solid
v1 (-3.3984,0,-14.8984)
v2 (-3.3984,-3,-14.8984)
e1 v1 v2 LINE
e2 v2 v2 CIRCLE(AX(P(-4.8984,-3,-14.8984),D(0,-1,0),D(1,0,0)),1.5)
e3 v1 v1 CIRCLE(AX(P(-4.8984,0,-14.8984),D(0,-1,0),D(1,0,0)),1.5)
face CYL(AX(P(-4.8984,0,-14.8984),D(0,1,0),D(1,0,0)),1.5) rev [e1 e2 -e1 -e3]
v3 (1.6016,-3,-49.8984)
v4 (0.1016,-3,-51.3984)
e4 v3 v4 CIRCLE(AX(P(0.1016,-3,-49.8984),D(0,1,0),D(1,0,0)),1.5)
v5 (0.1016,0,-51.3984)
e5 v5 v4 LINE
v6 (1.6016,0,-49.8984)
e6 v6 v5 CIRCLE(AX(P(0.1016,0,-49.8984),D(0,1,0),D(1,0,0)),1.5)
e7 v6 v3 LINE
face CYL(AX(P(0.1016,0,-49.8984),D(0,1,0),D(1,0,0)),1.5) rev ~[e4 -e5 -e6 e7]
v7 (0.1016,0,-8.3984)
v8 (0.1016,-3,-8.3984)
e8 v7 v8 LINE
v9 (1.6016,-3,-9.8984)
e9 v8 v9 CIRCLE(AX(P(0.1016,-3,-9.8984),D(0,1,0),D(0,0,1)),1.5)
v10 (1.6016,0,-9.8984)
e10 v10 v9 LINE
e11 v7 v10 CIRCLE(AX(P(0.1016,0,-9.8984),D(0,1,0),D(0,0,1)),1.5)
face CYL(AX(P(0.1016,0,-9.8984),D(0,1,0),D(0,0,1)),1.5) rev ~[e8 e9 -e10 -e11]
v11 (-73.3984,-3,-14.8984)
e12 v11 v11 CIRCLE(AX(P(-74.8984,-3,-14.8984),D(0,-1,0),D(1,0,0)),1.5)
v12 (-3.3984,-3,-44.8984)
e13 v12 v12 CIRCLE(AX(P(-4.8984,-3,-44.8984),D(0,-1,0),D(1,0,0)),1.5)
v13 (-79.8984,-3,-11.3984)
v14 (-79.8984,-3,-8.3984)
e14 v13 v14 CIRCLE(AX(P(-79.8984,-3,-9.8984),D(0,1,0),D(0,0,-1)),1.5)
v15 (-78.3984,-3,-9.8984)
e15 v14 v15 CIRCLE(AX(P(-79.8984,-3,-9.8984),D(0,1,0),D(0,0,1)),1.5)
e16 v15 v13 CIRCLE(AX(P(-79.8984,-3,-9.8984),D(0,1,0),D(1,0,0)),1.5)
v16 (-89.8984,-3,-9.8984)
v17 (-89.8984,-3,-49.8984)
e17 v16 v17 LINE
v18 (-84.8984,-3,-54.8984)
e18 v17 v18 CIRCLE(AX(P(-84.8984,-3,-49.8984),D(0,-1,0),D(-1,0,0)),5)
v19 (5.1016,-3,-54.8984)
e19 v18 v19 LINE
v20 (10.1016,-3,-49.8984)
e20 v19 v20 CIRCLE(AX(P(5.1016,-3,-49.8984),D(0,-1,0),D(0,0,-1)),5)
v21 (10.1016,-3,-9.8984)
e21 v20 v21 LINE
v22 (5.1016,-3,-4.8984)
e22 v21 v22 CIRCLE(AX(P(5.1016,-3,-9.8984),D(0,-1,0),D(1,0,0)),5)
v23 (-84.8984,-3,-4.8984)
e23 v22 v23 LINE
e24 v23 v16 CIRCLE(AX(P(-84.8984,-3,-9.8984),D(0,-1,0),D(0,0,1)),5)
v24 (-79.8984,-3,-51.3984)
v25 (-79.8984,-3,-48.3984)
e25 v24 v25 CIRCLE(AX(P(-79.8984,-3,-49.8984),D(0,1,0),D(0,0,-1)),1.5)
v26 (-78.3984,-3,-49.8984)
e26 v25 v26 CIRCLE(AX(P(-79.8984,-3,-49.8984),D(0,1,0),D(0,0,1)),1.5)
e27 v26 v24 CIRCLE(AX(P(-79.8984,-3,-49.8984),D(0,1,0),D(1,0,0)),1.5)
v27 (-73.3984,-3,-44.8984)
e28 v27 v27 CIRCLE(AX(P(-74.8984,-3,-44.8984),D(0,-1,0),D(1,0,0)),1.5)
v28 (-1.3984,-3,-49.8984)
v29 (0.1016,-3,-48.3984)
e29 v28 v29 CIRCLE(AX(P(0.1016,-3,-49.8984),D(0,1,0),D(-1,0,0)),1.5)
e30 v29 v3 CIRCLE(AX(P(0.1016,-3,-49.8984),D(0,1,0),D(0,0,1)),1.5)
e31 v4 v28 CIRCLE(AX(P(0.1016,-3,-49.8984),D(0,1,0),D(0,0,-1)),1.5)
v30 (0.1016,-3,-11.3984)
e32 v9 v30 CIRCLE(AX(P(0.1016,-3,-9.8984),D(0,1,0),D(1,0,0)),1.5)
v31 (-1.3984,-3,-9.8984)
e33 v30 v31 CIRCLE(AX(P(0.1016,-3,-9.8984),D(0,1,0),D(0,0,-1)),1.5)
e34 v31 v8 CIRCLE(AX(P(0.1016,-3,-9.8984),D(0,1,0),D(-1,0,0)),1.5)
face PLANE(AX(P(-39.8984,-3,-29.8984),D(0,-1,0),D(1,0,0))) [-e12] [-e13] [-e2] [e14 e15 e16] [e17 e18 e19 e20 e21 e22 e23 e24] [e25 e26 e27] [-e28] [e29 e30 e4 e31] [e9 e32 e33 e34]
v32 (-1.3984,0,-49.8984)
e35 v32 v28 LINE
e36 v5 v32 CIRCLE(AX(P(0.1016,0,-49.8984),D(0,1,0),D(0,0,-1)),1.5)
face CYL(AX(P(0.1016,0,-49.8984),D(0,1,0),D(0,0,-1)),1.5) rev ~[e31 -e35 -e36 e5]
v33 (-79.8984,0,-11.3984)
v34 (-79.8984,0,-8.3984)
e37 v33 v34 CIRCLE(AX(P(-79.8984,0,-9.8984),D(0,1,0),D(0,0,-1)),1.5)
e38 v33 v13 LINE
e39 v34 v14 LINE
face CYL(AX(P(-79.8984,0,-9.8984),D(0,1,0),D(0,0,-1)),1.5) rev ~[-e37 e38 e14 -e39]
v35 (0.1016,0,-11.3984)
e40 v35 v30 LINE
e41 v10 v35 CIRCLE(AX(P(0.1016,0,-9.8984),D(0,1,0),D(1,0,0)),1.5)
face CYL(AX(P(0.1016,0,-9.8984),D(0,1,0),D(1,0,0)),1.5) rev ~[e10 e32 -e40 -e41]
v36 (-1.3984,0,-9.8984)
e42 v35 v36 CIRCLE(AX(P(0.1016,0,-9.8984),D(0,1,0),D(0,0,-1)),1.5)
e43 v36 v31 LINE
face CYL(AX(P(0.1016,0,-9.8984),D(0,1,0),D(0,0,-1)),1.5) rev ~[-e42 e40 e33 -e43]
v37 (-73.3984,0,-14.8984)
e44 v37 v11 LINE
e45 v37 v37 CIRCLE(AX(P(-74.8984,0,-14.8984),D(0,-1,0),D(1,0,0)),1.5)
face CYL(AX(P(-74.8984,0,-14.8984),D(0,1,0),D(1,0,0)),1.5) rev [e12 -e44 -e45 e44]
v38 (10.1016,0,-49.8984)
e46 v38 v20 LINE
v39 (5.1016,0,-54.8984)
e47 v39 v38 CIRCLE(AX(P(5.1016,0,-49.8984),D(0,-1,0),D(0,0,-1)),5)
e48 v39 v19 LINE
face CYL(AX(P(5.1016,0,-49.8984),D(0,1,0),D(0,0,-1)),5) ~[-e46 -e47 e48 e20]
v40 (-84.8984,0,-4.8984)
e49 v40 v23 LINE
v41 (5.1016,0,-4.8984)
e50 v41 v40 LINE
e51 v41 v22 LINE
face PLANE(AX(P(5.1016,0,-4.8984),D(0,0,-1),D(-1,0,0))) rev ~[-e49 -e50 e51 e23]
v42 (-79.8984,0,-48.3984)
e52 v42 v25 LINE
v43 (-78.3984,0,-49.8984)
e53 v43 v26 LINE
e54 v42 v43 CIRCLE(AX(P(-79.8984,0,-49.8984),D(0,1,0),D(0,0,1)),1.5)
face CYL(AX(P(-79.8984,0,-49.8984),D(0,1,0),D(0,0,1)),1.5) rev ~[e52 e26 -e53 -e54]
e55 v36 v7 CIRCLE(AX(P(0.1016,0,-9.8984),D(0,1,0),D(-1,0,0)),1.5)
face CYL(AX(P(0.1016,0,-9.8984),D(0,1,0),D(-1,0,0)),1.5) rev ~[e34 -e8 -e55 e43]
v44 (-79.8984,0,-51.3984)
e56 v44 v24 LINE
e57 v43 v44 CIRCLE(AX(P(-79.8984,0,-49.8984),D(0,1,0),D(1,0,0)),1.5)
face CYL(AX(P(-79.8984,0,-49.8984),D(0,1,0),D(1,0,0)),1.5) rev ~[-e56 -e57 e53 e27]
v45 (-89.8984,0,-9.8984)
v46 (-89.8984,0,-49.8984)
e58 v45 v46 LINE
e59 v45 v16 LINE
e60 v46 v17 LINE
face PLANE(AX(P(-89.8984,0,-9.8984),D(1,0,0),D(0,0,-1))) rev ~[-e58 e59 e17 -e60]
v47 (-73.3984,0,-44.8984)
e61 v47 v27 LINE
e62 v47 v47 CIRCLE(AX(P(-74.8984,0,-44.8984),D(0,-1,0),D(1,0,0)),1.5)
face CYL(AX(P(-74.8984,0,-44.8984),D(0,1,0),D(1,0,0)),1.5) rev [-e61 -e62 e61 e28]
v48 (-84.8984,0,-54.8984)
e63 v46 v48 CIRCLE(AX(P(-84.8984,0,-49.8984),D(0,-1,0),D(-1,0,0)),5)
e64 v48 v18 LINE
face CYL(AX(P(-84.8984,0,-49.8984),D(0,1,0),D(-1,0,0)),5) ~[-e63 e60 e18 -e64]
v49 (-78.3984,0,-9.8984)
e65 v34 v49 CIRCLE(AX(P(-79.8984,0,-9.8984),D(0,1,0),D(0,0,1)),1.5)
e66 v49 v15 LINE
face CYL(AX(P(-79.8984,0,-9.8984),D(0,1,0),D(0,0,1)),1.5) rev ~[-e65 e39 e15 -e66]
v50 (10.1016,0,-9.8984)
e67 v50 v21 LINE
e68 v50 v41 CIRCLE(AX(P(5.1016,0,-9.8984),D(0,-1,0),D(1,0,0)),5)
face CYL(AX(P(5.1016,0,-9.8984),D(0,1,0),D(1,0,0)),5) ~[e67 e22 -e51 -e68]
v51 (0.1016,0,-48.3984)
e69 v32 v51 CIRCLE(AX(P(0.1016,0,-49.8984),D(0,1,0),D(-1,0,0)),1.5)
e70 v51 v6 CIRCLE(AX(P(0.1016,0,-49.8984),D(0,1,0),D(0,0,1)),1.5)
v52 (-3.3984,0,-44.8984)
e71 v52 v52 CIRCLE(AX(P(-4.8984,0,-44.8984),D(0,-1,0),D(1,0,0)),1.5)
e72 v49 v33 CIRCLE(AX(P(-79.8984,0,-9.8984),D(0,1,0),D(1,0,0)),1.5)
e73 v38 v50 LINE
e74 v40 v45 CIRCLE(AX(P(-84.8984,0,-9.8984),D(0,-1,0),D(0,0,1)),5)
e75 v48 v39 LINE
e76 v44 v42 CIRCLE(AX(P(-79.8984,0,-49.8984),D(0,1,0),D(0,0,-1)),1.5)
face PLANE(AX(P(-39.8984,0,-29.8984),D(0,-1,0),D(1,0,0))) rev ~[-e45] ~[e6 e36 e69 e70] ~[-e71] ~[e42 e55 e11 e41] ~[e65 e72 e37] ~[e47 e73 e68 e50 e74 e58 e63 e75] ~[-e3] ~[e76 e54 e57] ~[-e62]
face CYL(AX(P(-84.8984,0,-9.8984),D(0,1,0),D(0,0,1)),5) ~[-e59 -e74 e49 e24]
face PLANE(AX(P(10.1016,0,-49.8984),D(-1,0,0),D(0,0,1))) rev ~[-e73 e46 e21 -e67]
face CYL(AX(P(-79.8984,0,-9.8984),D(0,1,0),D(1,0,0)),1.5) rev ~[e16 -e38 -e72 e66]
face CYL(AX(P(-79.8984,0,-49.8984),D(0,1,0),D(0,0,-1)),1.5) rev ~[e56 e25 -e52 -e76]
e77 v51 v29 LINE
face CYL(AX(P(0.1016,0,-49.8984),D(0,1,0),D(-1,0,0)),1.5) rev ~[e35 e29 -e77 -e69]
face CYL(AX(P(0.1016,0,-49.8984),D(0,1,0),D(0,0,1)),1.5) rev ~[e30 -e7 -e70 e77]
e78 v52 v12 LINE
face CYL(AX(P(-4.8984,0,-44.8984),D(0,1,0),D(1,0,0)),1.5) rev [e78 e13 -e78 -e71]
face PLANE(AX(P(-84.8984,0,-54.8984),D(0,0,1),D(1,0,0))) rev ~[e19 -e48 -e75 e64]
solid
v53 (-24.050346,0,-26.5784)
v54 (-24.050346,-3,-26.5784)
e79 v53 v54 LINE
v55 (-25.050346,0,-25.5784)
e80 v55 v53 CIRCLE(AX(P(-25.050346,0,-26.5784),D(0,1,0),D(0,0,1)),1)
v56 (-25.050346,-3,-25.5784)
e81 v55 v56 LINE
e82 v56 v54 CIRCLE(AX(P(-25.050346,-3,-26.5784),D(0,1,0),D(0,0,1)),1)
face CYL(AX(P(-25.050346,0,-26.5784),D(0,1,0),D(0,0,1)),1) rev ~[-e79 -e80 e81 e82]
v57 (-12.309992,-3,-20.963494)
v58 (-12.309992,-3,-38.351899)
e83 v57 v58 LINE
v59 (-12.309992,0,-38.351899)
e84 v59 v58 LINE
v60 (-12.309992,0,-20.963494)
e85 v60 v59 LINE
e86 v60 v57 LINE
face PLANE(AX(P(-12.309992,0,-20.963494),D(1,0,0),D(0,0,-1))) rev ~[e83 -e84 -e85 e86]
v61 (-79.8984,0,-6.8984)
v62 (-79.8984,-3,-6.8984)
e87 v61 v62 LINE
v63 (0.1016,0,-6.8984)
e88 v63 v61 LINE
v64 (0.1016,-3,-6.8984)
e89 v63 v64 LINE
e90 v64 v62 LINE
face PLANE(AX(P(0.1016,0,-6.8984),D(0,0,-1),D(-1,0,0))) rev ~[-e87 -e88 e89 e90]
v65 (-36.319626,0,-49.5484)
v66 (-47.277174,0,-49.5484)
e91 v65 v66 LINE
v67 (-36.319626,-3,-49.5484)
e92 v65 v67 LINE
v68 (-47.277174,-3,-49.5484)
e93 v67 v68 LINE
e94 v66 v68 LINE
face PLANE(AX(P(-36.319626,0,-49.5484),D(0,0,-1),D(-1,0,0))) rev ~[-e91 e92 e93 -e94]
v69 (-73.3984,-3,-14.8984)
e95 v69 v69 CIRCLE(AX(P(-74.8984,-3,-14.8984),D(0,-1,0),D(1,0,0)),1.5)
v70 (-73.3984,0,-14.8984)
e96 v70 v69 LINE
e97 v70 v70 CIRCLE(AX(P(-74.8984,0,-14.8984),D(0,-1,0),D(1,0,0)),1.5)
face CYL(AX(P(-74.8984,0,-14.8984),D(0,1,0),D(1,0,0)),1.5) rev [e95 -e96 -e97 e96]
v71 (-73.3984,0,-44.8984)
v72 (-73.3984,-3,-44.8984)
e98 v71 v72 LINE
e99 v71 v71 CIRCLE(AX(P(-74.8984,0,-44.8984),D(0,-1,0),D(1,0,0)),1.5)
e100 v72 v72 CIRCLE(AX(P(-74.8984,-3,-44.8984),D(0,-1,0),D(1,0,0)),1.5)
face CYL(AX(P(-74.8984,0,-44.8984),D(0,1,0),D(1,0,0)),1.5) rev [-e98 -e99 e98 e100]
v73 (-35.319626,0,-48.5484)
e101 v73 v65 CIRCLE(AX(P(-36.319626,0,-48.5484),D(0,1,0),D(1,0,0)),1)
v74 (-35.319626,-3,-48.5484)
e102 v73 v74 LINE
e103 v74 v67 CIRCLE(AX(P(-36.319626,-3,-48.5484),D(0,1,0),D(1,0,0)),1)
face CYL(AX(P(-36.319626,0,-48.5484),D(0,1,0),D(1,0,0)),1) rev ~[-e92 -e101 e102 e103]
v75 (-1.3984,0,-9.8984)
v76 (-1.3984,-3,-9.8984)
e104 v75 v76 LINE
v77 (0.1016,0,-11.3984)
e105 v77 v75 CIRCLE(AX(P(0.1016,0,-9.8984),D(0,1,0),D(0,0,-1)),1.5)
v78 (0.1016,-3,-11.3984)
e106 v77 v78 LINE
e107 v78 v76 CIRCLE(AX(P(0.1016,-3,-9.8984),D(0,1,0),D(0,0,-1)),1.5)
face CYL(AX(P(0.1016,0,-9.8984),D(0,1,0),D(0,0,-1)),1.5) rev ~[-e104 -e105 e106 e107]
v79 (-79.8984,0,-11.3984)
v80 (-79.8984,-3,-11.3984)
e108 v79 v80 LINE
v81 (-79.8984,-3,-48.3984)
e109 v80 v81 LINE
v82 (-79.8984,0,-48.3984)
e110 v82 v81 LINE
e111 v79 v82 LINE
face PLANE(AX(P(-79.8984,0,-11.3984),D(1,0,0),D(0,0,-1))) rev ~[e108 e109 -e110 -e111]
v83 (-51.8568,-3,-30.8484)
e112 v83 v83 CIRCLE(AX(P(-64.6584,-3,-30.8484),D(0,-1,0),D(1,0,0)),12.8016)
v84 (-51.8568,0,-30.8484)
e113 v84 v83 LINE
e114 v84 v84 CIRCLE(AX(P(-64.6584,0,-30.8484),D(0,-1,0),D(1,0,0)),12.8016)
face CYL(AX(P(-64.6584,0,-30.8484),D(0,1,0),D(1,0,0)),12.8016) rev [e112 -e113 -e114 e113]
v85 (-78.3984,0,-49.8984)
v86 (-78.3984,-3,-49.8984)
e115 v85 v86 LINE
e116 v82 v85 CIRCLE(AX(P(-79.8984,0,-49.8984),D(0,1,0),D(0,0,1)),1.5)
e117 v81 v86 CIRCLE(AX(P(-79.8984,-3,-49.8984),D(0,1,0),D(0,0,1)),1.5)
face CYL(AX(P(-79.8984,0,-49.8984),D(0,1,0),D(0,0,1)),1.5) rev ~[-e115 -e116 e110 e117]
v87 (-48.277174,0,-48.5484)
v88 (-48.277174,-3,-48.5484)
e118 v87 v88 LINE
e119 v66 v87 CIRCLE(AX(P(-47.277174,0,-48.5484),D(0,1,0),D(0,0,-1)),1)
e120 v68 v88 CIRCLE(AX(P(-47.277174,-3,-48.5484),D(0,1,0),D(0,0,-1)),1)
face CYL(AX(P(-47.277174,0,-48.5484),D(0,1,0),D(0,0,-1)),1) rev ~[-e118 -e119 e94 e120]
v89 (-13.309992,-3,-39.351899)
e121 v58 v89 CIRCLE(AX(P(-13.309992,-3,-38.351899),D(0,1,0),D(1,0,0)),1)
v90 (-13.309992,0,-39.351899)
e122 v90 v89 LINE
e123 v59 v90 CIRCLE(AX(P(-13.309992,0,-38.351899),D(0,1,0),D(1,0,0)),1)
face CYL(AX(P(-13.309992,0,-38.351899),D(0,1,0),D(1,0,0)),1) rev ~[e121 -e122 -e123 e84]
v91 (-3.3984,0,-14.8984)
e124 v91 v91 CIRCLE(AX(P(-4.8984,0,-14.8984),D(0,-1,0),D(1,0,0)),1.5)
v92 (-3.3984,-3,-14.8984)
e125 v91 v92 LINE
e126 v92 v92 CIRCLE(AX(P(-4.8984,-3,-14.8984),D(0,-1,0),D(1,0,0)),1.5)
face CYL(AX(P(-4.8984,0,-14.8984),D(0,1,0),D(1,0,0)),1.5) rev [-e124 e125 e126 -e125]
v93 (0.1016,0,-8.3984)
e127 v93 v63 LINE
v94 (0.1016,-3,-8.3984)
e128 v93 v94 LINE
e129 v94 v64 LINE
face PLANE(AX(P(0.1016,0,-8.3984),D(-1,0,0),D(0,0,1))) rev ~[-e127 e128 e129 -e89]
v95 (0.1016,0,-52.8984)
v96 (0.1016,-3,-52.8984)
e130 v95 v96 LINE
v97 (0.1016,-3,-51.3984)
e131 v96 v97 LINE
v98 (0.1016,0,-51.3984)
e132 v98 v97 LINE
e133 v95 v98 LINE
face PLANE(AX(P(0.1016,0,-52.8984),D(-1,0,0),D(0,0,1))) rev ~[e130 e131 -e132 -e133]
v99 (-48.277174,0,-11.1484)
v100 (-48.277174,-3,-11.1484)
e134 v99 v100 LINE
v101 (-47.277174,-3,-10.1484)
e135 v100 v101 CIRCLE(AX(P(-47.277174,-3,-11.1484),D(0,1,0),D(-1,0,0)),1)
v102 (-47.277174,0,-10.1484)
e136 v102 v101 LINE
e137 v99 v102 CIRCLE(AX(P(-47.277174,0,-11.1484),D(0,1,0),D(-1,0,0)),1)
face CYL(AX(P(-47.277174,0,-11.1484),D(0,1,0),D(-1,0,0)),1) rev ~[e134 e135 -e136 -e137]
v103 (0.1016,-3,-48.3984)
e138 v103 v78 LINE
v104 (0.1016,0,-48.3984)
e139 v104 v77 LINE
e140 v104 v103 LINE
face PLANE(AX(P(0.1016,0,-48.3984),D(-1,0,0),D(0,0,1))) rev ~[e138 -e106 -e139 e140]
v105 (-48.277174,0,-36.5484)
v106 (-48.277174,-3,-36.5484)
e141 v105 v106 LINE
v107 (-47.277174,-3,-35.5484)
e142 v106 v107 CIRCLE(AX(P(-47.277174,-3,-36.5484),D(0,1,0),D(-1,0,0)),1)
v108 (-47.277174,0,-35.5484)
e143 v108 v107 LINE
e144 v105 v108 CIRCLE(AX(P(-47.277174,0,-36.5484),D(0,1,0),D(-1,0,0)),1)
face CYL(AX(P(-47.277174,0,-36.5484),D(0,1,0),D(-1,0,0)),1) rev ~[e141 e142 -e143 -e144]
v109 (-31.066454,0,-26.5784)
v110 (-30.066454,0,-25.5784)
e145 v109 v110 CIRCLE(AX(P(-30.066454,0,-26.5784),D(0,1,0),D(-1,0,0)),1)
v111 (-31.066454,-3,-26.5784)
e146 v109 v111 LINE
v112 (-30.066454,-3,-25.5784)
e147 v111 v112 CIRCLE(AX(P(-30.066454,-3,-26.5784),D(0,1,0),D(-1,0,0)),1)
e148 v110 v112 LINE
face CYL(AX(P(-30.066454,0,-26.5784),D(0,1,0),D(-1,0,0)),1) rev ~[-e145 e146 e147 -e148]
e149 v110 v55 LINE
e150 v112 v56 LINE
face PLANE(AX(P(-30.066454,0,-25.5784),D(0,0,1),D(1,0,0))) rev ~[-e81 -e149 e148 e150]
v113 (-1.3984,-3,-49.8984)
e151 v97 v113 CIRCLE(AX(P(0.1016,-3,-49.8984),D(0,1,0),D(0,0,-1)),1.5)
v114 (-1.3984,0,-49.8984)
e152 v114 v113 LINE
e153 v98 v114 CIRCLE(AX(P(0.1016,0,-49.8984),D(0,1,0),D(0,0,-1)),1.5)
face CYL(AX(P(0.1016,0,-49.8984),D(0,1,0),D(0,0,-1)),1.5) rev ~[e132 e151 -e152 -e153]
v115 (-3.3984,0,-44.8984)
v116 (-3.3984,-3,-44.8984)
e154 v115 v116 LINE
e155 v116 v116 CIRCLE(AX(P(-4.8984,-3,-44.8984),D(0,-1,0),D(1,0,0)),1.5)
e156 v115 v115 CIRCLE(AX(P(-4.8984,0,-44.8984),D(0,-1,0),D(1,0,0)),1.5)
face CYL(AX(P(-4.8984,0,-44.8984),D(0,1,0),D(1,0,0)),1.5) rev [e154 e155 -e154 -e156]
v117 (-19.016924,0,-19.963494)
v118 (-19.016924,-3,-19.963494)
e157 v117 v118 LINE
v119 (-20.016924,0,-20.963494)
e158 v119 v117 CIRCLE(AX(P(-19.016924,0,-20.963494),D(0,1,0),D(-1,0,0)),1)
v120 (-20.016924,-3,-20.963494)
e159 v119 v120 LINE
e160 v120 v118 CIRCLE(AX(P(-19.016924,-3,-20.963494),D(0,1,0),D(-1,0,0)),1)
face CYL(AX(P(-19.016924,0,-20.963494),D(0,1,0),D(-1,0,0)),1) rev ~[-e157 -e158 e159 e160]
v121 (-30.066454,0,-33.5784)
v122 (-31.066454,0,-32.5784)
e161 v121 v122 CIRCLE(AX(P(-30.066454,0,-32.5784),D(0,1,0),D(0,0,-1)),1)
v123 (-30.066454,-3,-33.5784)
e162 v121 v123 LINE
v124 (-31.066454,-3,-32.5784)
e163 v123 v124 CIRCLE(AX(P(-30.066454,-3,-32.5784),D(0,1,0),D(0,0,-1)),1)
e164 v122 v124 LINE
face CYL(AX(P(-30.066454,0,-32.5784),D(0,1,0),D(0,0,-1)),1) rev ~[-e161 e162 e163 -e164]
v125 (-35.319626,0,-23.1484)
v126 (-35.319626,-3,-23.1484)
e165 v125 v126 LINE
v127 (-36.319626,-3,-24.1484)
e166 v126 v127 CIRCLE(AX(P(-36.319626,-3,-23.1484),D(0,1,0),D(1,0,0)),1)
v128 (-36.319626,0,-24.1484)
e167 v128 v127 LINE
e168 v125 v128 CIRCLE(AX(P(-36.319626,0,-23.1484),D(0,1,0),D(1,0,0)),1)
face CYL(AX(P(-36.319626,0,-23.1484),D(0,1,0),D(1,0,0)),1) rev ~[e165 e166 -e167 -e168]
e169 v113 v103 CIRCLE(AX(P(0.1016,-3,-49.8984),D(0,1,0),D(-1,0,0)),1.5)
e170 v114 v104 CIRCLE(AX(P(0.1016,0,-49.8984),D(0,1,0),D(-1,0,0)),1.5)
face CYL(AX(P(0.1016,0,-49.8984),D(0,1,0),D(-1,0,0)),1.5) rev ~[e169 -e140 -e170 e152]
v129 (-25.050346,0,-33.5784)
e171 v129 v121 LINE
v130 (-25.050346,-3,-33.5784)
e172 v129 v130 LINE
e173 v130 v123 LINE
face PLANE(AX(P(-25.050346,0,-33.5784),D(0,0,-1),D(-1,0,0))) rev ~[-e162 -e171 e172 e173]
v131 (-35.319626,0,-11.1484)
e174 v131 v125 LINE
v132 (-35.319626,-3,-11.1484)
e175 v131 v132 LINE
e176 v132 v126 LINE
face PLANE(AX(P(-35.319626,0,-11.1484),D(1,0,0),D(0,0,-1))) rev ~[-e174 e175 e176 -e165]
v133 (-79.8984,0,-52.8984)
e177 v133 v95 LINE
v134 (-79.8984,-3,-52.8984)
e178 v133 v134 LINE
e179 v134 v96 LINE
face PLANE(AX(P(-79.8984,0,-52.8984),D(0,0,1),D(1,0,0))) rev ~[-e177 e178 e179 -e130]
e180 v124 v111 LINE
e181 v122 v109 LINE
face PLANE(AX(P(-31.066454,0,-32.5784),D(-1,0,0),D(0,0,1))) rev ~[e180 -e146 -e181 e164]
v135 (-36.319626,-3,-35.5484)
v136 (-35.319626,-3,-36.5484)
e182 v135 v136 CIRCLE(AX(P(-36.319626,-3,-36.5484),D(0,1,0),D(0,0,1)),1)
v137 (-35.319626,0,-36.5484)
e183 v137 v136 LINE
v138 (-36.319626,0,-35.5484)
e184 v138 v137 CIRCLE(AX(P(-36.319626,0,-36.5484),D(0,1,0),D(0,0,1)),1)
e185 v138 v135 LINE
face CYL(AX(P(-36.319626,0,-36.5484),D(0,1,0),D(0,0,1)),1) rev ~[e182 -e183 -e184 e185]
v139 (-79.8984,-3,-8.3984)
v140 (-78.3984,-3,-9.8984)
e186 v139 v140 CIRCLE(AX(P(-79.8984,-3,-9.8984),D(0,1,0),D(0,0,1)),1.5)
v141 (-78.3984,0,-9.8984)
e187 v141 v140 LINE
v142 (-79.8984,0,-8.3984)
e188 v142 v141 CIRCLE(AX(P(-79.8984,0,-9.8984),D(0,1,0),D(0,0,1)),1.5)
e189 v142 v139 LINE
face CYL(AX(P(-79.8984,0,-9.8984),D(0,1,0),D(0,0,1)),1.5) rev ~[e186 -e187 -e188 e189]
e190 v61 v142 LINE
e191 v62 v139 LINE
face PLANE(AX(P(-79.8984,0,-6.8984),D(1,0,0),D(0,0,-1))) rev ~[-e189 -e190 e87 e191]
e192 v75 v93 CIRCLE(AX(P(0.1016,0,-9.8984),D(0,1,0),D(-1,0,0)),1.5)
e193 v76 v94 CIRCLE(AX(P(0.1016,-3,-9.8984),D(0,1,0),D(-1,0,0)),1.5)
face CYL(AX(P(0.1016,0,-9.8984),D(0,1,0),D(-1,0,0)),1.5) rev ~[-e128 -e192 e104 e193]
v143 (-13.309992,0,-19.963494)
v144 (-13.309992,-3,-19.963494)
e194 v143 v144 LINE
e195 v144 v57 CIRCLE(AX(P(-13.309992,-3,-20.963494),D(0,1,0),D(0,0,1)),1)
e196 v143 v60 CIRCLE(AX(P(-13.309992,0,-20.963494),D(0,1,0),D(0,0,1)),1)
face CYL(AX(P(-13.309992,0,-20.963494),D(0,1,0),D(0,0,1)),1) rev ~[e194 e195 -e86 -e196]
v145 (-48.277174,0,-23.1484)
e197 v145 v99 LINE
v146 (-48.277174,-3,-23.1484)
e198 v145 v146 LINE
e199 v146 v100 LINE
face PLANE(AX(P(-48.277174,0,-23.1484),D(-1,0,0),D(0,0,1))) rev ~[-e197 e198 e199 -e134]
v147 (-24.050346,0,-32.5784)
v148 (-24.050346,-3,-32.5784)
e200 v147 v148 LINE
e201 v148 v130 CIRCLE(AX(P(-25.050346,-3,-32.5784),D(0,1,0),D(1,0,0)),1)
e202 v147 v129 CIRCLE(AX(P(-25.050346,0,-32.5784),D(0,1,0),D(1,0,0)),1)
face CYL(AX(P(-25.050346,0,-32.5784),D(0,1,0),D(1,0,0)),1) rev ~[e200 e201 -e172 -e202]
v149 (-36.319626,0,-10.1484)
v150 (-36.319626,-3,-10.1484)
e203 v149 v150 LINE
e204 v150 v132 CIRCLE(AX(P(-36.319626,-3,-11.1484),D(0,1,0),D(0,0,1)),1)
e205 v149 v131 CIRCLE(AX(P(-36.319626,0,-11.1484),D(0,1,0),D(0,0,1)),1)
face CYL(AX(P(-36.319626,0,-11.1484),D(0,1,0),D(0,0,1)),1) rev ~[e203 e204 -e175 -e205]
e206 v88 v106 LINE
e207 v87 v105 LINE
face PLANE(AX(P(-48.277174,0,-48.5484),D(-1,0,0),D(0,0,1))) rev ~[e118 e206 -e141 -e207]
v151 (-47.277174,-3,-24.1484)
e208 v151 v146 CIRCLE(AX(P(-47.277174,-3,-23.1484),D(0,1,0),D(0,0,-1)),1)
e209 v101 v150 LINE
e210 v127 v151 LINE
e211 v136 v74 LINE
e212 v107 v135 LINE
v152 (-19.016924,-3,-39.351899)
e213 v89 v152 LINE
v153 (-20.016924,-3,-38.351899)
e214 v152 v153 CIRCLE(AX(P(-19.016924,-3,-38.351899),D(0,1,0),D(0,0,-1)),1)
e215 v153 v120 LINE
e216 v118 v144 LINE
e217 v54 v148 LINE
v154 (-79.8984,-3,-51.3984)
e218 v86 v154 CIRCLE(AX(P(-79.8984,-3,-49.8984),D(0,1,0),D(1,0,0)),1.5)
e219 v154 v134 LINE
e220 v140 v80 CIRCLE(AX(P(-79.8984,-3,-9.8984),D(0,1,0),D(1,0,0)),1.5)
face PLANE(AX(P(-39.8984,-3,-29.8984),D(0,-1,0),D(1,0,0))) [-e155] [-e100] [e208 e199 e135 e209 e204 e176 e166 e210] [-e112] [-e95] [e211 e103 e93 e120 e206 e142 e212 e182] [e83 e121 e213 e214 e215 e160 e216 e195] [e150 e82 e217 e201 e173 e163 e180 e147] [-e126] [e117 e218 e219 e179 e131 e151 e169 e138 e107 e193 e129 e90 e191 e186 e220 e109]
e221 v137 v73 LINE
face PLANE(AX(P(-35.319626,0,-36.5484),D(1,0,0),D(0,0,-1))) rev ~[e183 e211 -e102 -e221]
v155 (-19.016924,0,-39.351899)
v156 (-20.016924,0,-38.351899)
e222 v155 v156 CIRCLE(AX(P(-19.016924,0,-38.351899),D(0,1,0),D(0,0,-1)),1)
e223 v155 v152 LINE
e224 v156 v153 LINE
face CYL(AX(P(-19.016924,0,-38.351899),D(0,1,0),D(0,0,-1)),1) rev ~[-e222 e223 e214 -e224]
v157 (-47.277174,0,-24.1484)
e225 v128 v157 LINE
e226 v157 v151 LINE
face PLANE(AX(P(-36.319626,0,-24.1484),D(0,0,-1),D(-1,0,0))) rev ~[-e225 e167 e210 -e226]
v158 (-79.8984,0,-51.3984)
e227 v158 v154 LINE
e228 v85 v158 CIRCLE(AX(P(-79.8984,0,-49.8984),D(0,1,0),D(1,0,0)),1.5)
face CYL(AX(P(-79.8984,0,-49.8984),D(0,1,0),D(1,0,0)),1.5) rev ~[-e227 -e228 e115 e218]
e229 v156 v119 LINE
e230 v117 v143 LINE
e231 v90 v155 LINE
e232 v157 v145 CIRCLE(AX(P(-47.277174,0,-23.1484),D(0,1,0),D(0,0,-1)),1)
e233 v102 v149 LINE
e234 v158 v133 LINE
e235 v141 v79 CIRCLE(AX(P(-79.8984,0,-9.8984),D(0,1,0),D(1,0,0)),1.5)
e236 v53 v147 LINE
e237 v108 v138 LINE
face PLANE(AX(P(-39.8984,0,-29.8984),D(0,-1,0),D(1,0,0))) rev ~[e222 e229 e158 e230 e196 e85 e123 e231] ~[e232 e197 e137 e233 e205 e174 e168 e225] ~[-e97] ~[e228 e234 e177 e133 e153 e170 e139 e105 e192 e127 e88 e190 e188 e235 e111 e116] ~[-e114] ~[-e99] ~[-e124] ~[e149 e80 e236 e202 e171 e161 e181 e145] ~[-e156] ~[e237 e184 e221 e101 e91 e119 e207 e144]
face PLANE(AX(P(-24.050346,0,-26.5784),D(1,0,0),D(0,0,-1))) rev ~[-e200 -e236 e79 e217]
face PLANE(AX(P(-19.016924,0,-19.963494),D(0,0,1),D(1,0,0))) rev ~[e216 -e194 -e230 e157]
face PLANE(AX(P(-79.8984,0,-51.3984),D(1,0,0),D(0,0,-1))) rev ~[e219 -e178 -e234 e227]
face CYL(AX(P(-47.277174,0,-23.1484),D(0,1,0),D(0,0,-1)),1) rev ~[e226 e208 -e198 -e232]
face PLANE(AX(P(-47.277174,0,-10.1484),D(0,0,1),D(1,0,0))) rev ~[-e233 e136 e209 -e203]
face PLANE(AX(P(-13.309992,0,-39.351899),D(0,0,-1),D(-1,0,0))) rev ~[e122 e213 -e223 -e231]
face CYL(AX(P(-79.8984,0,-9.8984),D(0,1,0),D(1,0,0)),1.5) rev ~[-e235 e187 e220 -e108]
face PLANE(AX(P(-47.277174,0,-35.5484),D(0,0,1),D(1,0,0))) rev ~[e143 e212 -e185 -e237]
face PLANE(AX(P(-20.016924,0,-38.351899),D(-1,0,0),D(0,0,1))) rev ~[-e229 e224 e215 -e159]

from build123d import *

# Parameters (mm, degrees)
F1_R     = 1.5
F1_R_2   = 12.8016
F2_DEPTH = 3
F3_DEPTH = 3


# Not quite as in the source:
# - a feature names something its author has since deleted; it is built from what else it names


with BuildPart() as f2:
    # F1 (on Front) → F2 (new body)
    with BuildSketch(Plane.XZ):
        with BuildLine():
            ThreePointArc((-79.8984, -48.3984), (-78.8377398282, -48.8377398282), (-78.3984, -49.8984))
            Line((-78.3984, -49.8984), (-1.3984, -49.8984))
            ThreePointArc((-1.3984, -49.8984), (-0.9590601718, -48.8377398282), (0.1016, -48.3984))
            Line((0.1016, -48.3984), (0.1016, -11.3984))
            ThreePointArc((0.1016, -11.3984), (-0.9590601718, -10.9590601718), (-1.3984, -9.8984))
            Line((-1.3984, -9.8984), (-78.3984, -9.8984))
            ThreePointArc((-78.3984, -9.8984), (-78.8377398282, -10.9590601718), (-79.8984, -11.3984))
            Line((-79.8984, -11.3984), (-79.8984, -48.3984))
        make_face()
        with Locations((-74.8984, -44.8984)):
            Circle(F1_R, mode=Mode.SUBTRACT)
        with BuildLine():
            ThreePointArc((-35.3196263313, -48.5484), (-35.6125195501, -49.2555067812), (-36.3196263313, -49.5484))
            Line((-36.3196263313, -49.5484), (-47.2771736687, -49.5484))
            ThreePointArc((-47.2771736687, -49.5484), (-47.9842804499, -49.2555067812), (-48.2771736687, -48.5484))
            Line((-48.2771736687, -48.5484), (-48.2771736687, -36.5484))
            ThreePointArc((-48.2771736687, -36.5484), (-47.9842804499, -35.8412932188), (-47.2771736687, -35.5484))
            Line((-47.2771736687, -35.5484), (-36.3196263313, -35.5484))
            ThreePointArc((-36.3196263313, -35.5484), (-35.6125195501, -35.8412932188), (-35.3196263313, -36.5484))
            Line((-35.3196263313, -36.5484), (-35.3196263313, -48.5484))
        make_face(mode=Mode.SUBTRACT)
        with Locations((-64.6584, -30.8484)):
            Circle(F1_R_2, mode=Mode.SUBTRACT)
        with Locations((-4.8984, -44.8984)):
            Circle(F1_R, mode=Mode.SUBTRACT)
        with Locations((-74.8984, -14.8984)):
            Circle(F1_R, mode=Mode.SUBTRACT)
        with BuildLine():
            ThreePointArc((-35.3196263313, -23.1484), (-35.6125195501, -23.8555067812), (-36.3196263313, -24.1484))
            Line((-36.3196263313, -24.1484), (-47.2771736687, -24.1484))
            ThreePointArc((-47.2771736687, -24.1484), (-47.9842804499, -23.8555067812), (-48.2771736687, -23.1484))
            Line((-48.2771736687, -23.1484), (-48.2771736687, -11.1484))
            ThreePointArc((-48.2771736687, -11.1484), (-47.9842804499, -10.4412932188), (-47.2771736687, -10.1484))
            Line((-47.2771736687, -10.1484), (-36.3196263313, -10.1484))
            ThreePointArc((-36.3196263313, -10.1484), (-35.6125195501, -10.4412932188), (-35.3196263313, -11.1484))
            Line((-35.3196263313, -11.1484), (-35.3196263313, -23.1484))
        make_face(mode=Mode.SUBTRACT)
        with BuildLine():
            ThreePointArc((-24.0503456444, -32.5784), (-24.3432388632, -33.2855067812), (-25.0503456444, -33.5784))
            Line((-25.0503456444, -33.5784), (-30.0664543556, -33.5784))
            ThreePointArc((-30.0664543556, -33.5784), (-30.7735611368, -33.2855067812), (-31.0664543556, -32.5784))
            Line((-31.0664543556, -32.5784), (-31.0664543556, -26.5784))
            ThreePointArc((-31.0664543556, -26.5784), (-30.7735611368, -25.8712932188), (-30.0664543556, -25.5784))
            Line((-30.0664543556, -25.5784), (-25.0503456444, -25.5784))
            ThreePointArc((-25.0503456444, -25.5784), (-24.3432388632, -25.8712932188), (-24.0503456444, -26.5784))
            Line((-24.0503456444, -26.5784), (-24.0503456444, -32.5784))
        make_face(mode=Mode.SUBTRACT)
        with BuildLine():
            ThreePointArc((-20.0169235468, -20.9634935707), (-19.724030328, -20.2563867895), (-19.0169235468, -19.9634935707))
            Line((-19.0169235468, -19.9634935707), (-13.3099917546, -19.9634935707))
            ThreePointArc((-13.3099917546, -19.9634935707), (-12.6028849734, -20.2563867895), (-12.3099917546, -20.9634935707))
            Line((-12.3099917546, -20.9634935707), (-12.3099917546, -38.3518991768))
            ThreePointArc((-12.3099917546, -38.3518991768), (-12.6028849734, -39.059005958), (-13.3099917546, -39.3518991768))
            Line((-13.3099917546, -39.3518991768), (-19.0169235468, -39.3518991768))
            ThreePointArc((-19.0169235468, -39.3518991768), (-19.724030328, -39.059005958), (-20.0169235468, -38.3518991768))
            Line((-20.0169235468, -38.3518991768), (-20.0169235468, -20.9634935707))
        make_face(mode=Mode.SUBTRACT)
        with Locations((-4.8984, -14.8984)):
            Circle(F1_R, mode=Mode.SUBTRACT)
        with BuildLine():
            Line((-79.8984, -6.8984), (-79.8984, -8.3984))
            ThreePointArc((-79.8984, -8.3984), (-78.8377398282, -8.8377398282), (-78.3984, -9.8984))
            Line((-78.3984, -9.8984), (-1.3984, -9.8984))
            ThreePointArc((-1.3984, -9.8984), (-0.9590601718, -8.8377398282), (0.1016, -8.3984))
            Line((0.1016, -8.3984), (0.1016, -6.8984))
            Line((0.1016, -6.8984), (-79.8984, -6.8984))
        make_face()
        with BuildLine():
            Line((-1.3984, -49.8984), (-78.3984, -49.8984))
            ThreePointArc((-78.3984, -49.8984), (-78.8377398282, -50.9590601718), (-79.8984, -51.3984))
            Line((-79.8984, -51.3984), (-79.8984, -52.8984))
            Line((-79.8984, -52.8984), (0.1016, -52.8984))
            Line((0.1016, -52.8984), (0.1016, -51.3984))
            ThreePointArc((0.1016, -51.3984), (-0.9590601718, -50.9590601718), (-1.3984, -49.8984))
        make_face()
    extrude(amount=F2_DEPTH)


with BuildPart() as f3:
    # F1 (on Front) → F3 (new body)
    with BuildSketch(Plane.XZ):
        with BuildLine():
            Line((-84.8984, -54.8984), (5.1016, -54.8984))
            ThreePointArc((5.1016, -54.8984), (8.6371339059, -53.4339339059), (10.1016, -49.8984))
            Line((10.1016, -49.8984), (10.1016, -9.8984))
            ThreePointArc((10.1016, -9.8984), (8.6371339059, -6.3628660941), (5.1016, -4.8984))
            Line((5.1016, -4.8984), (-84.8984, -4.8984))
            ThreePointArc((-84.8984, -4.8984), (-88.4339339059, -6.3628660941), (-89.8984, -9.8984))
            Line((-89.8984, -9.8984), (-89.8984, -49.8984))
            ThreePointArc((-89.8984, -49.8984), (-88.4339339059, -53.4339339059), (-84.8984, -54.8984))
        make_face()
        with BuildLine():
            ThreePointArc((-79.8984, -51.3984), (-81.3984, -49.8984), (-79.8984, -48.3984))
            Line((-79.8984, -48.3984), (-79.8984, -11.3984))
            ThreePointArc((-79.8984, -11.3984), (-81.3984, -9.8984), (-79.8984, -8.3984))
            Line((-79.8984, -8.3984), (-79.8984, -6.8984))
            Line((-79.8984, -6.8984), (0.1016, -6.8984))
            Line((0.1016, -6.8984), (0.1016, -8.3984))
            ThreePointArc((0.1016, -8.3984), (1.1622601718, -8.8377398282), (1.6016, -9.8984))
            ThreePointArc((1.6016, -9.8984), (1.1622601718, -10.9590601718), (0.1016, -11.3984))
            Line((0.1016, -11.3984), (0.1016, -48.3984))
            ThreePointArc((0.1016, -48.3984), (1.1622601718, -48.8377398282), (1.6016, -49.8984))
            ThreePointArc((1.6016, -49.8984), (1.1622601718, -50.9590601718), (0.1016, -51.3984))
            Line((0.1016, -51.3984), (0.1016, -52.8984))
            Line((0.1016, -52.8984), (-79.8984, -52.8984))
            Line((-79.8984, -52.8984), (-79.8984, -51.3984))
        make_face(mode=Mode.SUBTRACT)
        with BuildLine():
            ThreePointArc((-79.8984, -48.3984), (-78.8377398282, -48.8377398282), (-78.3984, -49.8984))
            Line((-78.3984, -49.8984), (-1.3984, -49.8984))
            ThreePointArc((-1.3984, -49.8984), (-0.9590601718, -48.8377398282), (0.1016, -48.3984))
            Line((0.1016, -48.3984), (0.1016, -11.3984))
            ThreePointArc((0.1016, -11.3984), (-0.9590601718, -10.9590601718), (-1.3984, -9.8984))
            Line((-1.3984, -9.8984), (-78.3984, -9.8984))
            ThreePointArc((-78.3984, -9.8984), (-78.8377398282, -10.9590601718), (-79.8984, -11.3984))
            Line((-79.8984, -11.3984), (-79.8984, -48.3984))
        make_face()
        with Locations((-74.8984, -44.8984)):
            Circle(F1_R, mode=Mode.SUBTRACT)
        with BuildLine():
            ThreePointArc((-35.3196263313, -48.5484), (-35.6125195501, -49.2555067812), (-36.3196263313, -49.5484))
            Line((-36.3196263313, -49.5484), (-47.2771736687, -49.5484))
            ThreePointArc((-47.2771736687, -49.5484), (-47.9842804499, -49.2555067812), (-48.2771736687, -48.5484))
            Line((-48.2771736687, -48.5484), (-48.2771736687, -36.5484))
            ThreePointArc((-48.2771736687, -36.5484), (-47.9842804499, -35.8412932188), (-47.2771736687, -35.5484))
            Line((-47.2771736687, -35.5484), (-36.3196263313, -35.5484))
            ThreePointArc((-36.3196263313, -35.5484), (-35.6125195501, -35.8412932188), (-35.3196263313, -36.5484))
            Line((-35.3196263313, -36.5484), (-35.3196263313, -48.5484))
        make_face(mode=Mode.SUBTRACT)
        with Locations((-64.6584, -30.8484)):
            Circle(F1_R_2, mode=Mode.SUBTRACT)
        with Locations((-4.8984, -44.8984)):
            Circle(F1_R, mode=Mode.SUBTRACT)
        with Locations((-74.8984, -14.8984)):
            Circle(F1_R, mode=Mode.SUBTRACT)
        with BuildLine():
            ThreePointArc((-35.3196263313, -23.1484), (-35.6125195501, -23.8555067812), (-36.3196263313, -24.1484))
            Line((-36.3196263313, -24.1484), (-47.2771736687, -24.1484))
            ThreePointArc((-47.2771736687, -24.1484), (-47.9842804499, -23.8555067812), (-48.2771736687, -23.1484))
            Line((-48.2771736687, -23.1484), (-48.2771736687, -11.1484))
            ThreePointArc((-48.2771736687, -11.1484), (-47.9842804499, -10.4412932188), (-47.2771736687, -10.1484))
            Line((-47.2771736687, -10.1484), (-36.3196263313, -10.1484))
            ThreePointArc((-36.3196263313, -10.1484), (-35.6125195501, -10.4412932188), (-35.3196263313, -11.1484))
            Line((-35.3196263313, -11.1484), (-35.3196263313, -23.1484))
        make_face(mode=Mode.SUBTRACT)
        with BuildLine():
            ThreePointArc((-24.0503456444, -32.5784), (-24.3432388632, -33.2855067812), (-25.0503456444, -33.5784))
            Line((-25.0503456444, -33.5784), (-30.0664543556, -33.5784))
            ThreePointArc((-30.0664543556, -33.5784), (-30.7735611368, -33.2855067812), (-31.0664543556, -32.5784))
            Line((-31.0664543556, -32.5784), (-31.0664543556, -26.5784))
            ThreePointArc((-31.0664543556, -26.5784), (-30.7735611368, -25.8712932188), (-30.0664543556, -25.5784))
            Line((-30.0664543556, -25.5784), (-25.0503456444, -25.5784))
            ThreePointArc((-25.0503456444, -25.5784), (-24.3432388632, -25.8712932188), (-24.0503456444, -26.5784))
            Line((-24.0503456444, -26.5784), (-24.0503456444, -32.5784))
        make_face(mode=Mode.SUBTRACT)
        with BuildLine():
            ThreePointArc((-20.0169235468, -20.9634935707), (-19.724030328, -20.2563867895), (-19.0169235468, -19.9634935707))
            Line((-19.0169235468, -19.9634935707), (-13.3099917546, -19.9634935707))
            ThreePointArc((-13.3099917546, -19.9634935707), (-12.6028849734, -20.2563867895), (-12.3099917546, -20.9634935707))
            Line((-12.3099917546, -20.9634935707), (-12.3099917546, -38.3518991768))
            ThreePointArc((-12.3099917546, -38.3518991768), (-12.6028849734, -39.059005958), (-13.3099917546, -39.3518991768))
            Line((-13.3099917546, -39.3518991768), (-19.0169235468, -39.3518991768))
            ThreePointArc((-19.0169235468, -39.3518991768), (-19.724030328, -39.059005958), (-20.0169235468, -38.3518991768))
            Line((-20.0169235468, -38.3518991768), (-20.0169235468, -20.9634935707))
        make_face(mode=Mode.SUBTRACT)
        with Locations((-4.8984, -14.8984)):
            Circle(F1_R, mode=Mode.SUBTRACT)
        with Locations((-64.6584, -30.8484)):
            Circle(F1_R_2)
        with BuildLine():
            Line((-79.8984, -6.8984), (-79.8984, -8.3984))
            ThreePointArc((-79.8984, -8.3984), (-78.8377398282, -8.8377398282), (-78.3984, -9.8984))
            Line((-78.3984, -9.8984), (-1.3984, -9.8984))
            ThreePointArc((-1.3984, -9.8984), (-0.9590601718, -8.8377398282), (0.1016, -8.3984))
            Line((0.1016, -8.3984), (0.1016, -6.8984))
            Line((0.1016, -6.8984), (-79.8984, -6.8984))
        make_face()
        with BuildLine():
            Line((-1.3984, -49.8984), (-78.3984, -49.8984))
            ThreePointArc((-78.3984, -49.8984), (-78.8377398282, -50.9590601718), (-79.8984, -51.3984))
            Line((-79.8984, -51.3984), (-79.8984, -52.8984))
            Line((-79.8984, -52.8984), (0.1016, -52.8984))
            Line((0.1016, -52.8984), (0.1016, -51.3984))
            ThreePointArc((0.1016, -51.3984), (-0.9590601718, -50.9590601718), (-1.3984, -49.8984))
        make_face()
        with BuildLine():
            Line((-47.2771736687, -24.1484), (-36.3196263313, -24.1484))
            ThreePointArc((-36.3196263313, -24.1484), (-35.6125195501, -23.8555067812), (-35.3196263313, -23.1484))
            Line((-35.3196263313, -23.1484), (-35.3196263313, -11.1484))
            ThreePointArc((-35.3196263313, -11.1484), (-35.6125195501, -10.4412932188), (-36.3196263313, -10.1484))
            Line((-36.3196263313, -10.1484), (-47.2771736687, -10.1484))
            ThreePointArc((-47.2771736687, -10.1484), (-47.9842804499, -10.4412932188), (-48.2771736687, -11.1484))
            Line((-48.2771736687, -11.1484), (-48.2771736687, -23.1484))
            ThreePointArc((-48.2771736687, -23.1484), (-47.9842804499, -23.8555067812), (-47.2771736687, -24.1484))
        make_face()
        with BuildLine():
            Line((-47.2771736687, -49.5484), (-36.3196263313, -49.5484))
            ThreePointArc((-36.3196263313, -49.5484), (-35.6125195501, -49.2555067812), (-35.3196263313, -48.5484))
            Line((-35.3196263313, -48.5484), (-35.3196263313, -36.5484))
            ThreePointArc((-35.3196263313, -36.5484), (-35.6125195501, -35.8412932188), (-36.3196263313, -35.5484))
            Line((-36.3196263313, -35.5484), (-47.2771736687, -35.5484))
            ThreePointArc((-47.2771736687, -35.5484), (-47.9842804499, -35.8412932188), (-48.2771736687, -36.5484))
            Line((-48.2771736687, -36.5484), (-48.2771736687, -48.5484))
            ThreePointArc((-48.2771736687, -48.5484), (-47.9842804499, -49.2555067812), (-47.2771736687, -49.5484))
        make_face()
        with BuildLine():
            Line((-13.3099917546, -19.9634935707), (-19.0169235468, -19.9634935707))
            ThreePointArc((-19.0169235468, -19.9634935707), (-19.724030328, -20.2563867895), (-20.0169235468, -20.9634935707))
            Line((-20.0169235468, -20.9634935707), (-20.0169235468, -38.3518991768))
            ThreePointArc((-20.0169235468, -38.3518991768), (-19.724030328, -39.059005958), (-19.0169235468, -39.3518991768))
            Line((-19.0169235468, -39.3518991768), (-13.3099917546, -39.3518991768))
            ThreePointArc((-13.3099917546, -39.3518991768), (-12.6028849734, -39.059005958), (-12.3099917546, -38.3518991768))
            Line((-12.3099917546, -38.3518991768), (-12.3099917546, -20.9634935707))
            ThreePointArc((-12.3099917546, -20.9634935707), (-12.6028849734, -20.2563867895), (-13.3099917546, -19.9634935707))
        make_face()
        with BuildLine():
            Line((-30.0664543556, -33.5784), (-25.0503456444, -33.5784))
            ThreePointArc((-25.0503456444, -33.5784), (-24.3432388632, -33.2855067812), (-24.0503456444, -32.5784))
            Line((-24.0503456444, -32.5784), (-24.0503456444, -26.5784))
            ThreePointArc((-24.0503456444, -26.5784), (-24.3432388632, -25.8712932188), (-25.0503456444, -25.5784))
            Line((-25.0503456444, -25.5784), (-30.0664543556, -25.5784))
            ThreePointArc((-30.0664543556, -25.5784), (-30.7735611368, -25.8712932188), (-31.0664543556, -26.5784))
            Line((-31.0664543556, -26.5784), (-31.0664543556, -32.5784))
            ThreePointArc((-31.0664543556, -32.5784), (-30.7735611368, -33.2855067812), (-30.0664543556, -33.5784))
        make_face()
    extrude(amount=F3_DEPTH)


solid = Compound([f2.part, f3.part])
